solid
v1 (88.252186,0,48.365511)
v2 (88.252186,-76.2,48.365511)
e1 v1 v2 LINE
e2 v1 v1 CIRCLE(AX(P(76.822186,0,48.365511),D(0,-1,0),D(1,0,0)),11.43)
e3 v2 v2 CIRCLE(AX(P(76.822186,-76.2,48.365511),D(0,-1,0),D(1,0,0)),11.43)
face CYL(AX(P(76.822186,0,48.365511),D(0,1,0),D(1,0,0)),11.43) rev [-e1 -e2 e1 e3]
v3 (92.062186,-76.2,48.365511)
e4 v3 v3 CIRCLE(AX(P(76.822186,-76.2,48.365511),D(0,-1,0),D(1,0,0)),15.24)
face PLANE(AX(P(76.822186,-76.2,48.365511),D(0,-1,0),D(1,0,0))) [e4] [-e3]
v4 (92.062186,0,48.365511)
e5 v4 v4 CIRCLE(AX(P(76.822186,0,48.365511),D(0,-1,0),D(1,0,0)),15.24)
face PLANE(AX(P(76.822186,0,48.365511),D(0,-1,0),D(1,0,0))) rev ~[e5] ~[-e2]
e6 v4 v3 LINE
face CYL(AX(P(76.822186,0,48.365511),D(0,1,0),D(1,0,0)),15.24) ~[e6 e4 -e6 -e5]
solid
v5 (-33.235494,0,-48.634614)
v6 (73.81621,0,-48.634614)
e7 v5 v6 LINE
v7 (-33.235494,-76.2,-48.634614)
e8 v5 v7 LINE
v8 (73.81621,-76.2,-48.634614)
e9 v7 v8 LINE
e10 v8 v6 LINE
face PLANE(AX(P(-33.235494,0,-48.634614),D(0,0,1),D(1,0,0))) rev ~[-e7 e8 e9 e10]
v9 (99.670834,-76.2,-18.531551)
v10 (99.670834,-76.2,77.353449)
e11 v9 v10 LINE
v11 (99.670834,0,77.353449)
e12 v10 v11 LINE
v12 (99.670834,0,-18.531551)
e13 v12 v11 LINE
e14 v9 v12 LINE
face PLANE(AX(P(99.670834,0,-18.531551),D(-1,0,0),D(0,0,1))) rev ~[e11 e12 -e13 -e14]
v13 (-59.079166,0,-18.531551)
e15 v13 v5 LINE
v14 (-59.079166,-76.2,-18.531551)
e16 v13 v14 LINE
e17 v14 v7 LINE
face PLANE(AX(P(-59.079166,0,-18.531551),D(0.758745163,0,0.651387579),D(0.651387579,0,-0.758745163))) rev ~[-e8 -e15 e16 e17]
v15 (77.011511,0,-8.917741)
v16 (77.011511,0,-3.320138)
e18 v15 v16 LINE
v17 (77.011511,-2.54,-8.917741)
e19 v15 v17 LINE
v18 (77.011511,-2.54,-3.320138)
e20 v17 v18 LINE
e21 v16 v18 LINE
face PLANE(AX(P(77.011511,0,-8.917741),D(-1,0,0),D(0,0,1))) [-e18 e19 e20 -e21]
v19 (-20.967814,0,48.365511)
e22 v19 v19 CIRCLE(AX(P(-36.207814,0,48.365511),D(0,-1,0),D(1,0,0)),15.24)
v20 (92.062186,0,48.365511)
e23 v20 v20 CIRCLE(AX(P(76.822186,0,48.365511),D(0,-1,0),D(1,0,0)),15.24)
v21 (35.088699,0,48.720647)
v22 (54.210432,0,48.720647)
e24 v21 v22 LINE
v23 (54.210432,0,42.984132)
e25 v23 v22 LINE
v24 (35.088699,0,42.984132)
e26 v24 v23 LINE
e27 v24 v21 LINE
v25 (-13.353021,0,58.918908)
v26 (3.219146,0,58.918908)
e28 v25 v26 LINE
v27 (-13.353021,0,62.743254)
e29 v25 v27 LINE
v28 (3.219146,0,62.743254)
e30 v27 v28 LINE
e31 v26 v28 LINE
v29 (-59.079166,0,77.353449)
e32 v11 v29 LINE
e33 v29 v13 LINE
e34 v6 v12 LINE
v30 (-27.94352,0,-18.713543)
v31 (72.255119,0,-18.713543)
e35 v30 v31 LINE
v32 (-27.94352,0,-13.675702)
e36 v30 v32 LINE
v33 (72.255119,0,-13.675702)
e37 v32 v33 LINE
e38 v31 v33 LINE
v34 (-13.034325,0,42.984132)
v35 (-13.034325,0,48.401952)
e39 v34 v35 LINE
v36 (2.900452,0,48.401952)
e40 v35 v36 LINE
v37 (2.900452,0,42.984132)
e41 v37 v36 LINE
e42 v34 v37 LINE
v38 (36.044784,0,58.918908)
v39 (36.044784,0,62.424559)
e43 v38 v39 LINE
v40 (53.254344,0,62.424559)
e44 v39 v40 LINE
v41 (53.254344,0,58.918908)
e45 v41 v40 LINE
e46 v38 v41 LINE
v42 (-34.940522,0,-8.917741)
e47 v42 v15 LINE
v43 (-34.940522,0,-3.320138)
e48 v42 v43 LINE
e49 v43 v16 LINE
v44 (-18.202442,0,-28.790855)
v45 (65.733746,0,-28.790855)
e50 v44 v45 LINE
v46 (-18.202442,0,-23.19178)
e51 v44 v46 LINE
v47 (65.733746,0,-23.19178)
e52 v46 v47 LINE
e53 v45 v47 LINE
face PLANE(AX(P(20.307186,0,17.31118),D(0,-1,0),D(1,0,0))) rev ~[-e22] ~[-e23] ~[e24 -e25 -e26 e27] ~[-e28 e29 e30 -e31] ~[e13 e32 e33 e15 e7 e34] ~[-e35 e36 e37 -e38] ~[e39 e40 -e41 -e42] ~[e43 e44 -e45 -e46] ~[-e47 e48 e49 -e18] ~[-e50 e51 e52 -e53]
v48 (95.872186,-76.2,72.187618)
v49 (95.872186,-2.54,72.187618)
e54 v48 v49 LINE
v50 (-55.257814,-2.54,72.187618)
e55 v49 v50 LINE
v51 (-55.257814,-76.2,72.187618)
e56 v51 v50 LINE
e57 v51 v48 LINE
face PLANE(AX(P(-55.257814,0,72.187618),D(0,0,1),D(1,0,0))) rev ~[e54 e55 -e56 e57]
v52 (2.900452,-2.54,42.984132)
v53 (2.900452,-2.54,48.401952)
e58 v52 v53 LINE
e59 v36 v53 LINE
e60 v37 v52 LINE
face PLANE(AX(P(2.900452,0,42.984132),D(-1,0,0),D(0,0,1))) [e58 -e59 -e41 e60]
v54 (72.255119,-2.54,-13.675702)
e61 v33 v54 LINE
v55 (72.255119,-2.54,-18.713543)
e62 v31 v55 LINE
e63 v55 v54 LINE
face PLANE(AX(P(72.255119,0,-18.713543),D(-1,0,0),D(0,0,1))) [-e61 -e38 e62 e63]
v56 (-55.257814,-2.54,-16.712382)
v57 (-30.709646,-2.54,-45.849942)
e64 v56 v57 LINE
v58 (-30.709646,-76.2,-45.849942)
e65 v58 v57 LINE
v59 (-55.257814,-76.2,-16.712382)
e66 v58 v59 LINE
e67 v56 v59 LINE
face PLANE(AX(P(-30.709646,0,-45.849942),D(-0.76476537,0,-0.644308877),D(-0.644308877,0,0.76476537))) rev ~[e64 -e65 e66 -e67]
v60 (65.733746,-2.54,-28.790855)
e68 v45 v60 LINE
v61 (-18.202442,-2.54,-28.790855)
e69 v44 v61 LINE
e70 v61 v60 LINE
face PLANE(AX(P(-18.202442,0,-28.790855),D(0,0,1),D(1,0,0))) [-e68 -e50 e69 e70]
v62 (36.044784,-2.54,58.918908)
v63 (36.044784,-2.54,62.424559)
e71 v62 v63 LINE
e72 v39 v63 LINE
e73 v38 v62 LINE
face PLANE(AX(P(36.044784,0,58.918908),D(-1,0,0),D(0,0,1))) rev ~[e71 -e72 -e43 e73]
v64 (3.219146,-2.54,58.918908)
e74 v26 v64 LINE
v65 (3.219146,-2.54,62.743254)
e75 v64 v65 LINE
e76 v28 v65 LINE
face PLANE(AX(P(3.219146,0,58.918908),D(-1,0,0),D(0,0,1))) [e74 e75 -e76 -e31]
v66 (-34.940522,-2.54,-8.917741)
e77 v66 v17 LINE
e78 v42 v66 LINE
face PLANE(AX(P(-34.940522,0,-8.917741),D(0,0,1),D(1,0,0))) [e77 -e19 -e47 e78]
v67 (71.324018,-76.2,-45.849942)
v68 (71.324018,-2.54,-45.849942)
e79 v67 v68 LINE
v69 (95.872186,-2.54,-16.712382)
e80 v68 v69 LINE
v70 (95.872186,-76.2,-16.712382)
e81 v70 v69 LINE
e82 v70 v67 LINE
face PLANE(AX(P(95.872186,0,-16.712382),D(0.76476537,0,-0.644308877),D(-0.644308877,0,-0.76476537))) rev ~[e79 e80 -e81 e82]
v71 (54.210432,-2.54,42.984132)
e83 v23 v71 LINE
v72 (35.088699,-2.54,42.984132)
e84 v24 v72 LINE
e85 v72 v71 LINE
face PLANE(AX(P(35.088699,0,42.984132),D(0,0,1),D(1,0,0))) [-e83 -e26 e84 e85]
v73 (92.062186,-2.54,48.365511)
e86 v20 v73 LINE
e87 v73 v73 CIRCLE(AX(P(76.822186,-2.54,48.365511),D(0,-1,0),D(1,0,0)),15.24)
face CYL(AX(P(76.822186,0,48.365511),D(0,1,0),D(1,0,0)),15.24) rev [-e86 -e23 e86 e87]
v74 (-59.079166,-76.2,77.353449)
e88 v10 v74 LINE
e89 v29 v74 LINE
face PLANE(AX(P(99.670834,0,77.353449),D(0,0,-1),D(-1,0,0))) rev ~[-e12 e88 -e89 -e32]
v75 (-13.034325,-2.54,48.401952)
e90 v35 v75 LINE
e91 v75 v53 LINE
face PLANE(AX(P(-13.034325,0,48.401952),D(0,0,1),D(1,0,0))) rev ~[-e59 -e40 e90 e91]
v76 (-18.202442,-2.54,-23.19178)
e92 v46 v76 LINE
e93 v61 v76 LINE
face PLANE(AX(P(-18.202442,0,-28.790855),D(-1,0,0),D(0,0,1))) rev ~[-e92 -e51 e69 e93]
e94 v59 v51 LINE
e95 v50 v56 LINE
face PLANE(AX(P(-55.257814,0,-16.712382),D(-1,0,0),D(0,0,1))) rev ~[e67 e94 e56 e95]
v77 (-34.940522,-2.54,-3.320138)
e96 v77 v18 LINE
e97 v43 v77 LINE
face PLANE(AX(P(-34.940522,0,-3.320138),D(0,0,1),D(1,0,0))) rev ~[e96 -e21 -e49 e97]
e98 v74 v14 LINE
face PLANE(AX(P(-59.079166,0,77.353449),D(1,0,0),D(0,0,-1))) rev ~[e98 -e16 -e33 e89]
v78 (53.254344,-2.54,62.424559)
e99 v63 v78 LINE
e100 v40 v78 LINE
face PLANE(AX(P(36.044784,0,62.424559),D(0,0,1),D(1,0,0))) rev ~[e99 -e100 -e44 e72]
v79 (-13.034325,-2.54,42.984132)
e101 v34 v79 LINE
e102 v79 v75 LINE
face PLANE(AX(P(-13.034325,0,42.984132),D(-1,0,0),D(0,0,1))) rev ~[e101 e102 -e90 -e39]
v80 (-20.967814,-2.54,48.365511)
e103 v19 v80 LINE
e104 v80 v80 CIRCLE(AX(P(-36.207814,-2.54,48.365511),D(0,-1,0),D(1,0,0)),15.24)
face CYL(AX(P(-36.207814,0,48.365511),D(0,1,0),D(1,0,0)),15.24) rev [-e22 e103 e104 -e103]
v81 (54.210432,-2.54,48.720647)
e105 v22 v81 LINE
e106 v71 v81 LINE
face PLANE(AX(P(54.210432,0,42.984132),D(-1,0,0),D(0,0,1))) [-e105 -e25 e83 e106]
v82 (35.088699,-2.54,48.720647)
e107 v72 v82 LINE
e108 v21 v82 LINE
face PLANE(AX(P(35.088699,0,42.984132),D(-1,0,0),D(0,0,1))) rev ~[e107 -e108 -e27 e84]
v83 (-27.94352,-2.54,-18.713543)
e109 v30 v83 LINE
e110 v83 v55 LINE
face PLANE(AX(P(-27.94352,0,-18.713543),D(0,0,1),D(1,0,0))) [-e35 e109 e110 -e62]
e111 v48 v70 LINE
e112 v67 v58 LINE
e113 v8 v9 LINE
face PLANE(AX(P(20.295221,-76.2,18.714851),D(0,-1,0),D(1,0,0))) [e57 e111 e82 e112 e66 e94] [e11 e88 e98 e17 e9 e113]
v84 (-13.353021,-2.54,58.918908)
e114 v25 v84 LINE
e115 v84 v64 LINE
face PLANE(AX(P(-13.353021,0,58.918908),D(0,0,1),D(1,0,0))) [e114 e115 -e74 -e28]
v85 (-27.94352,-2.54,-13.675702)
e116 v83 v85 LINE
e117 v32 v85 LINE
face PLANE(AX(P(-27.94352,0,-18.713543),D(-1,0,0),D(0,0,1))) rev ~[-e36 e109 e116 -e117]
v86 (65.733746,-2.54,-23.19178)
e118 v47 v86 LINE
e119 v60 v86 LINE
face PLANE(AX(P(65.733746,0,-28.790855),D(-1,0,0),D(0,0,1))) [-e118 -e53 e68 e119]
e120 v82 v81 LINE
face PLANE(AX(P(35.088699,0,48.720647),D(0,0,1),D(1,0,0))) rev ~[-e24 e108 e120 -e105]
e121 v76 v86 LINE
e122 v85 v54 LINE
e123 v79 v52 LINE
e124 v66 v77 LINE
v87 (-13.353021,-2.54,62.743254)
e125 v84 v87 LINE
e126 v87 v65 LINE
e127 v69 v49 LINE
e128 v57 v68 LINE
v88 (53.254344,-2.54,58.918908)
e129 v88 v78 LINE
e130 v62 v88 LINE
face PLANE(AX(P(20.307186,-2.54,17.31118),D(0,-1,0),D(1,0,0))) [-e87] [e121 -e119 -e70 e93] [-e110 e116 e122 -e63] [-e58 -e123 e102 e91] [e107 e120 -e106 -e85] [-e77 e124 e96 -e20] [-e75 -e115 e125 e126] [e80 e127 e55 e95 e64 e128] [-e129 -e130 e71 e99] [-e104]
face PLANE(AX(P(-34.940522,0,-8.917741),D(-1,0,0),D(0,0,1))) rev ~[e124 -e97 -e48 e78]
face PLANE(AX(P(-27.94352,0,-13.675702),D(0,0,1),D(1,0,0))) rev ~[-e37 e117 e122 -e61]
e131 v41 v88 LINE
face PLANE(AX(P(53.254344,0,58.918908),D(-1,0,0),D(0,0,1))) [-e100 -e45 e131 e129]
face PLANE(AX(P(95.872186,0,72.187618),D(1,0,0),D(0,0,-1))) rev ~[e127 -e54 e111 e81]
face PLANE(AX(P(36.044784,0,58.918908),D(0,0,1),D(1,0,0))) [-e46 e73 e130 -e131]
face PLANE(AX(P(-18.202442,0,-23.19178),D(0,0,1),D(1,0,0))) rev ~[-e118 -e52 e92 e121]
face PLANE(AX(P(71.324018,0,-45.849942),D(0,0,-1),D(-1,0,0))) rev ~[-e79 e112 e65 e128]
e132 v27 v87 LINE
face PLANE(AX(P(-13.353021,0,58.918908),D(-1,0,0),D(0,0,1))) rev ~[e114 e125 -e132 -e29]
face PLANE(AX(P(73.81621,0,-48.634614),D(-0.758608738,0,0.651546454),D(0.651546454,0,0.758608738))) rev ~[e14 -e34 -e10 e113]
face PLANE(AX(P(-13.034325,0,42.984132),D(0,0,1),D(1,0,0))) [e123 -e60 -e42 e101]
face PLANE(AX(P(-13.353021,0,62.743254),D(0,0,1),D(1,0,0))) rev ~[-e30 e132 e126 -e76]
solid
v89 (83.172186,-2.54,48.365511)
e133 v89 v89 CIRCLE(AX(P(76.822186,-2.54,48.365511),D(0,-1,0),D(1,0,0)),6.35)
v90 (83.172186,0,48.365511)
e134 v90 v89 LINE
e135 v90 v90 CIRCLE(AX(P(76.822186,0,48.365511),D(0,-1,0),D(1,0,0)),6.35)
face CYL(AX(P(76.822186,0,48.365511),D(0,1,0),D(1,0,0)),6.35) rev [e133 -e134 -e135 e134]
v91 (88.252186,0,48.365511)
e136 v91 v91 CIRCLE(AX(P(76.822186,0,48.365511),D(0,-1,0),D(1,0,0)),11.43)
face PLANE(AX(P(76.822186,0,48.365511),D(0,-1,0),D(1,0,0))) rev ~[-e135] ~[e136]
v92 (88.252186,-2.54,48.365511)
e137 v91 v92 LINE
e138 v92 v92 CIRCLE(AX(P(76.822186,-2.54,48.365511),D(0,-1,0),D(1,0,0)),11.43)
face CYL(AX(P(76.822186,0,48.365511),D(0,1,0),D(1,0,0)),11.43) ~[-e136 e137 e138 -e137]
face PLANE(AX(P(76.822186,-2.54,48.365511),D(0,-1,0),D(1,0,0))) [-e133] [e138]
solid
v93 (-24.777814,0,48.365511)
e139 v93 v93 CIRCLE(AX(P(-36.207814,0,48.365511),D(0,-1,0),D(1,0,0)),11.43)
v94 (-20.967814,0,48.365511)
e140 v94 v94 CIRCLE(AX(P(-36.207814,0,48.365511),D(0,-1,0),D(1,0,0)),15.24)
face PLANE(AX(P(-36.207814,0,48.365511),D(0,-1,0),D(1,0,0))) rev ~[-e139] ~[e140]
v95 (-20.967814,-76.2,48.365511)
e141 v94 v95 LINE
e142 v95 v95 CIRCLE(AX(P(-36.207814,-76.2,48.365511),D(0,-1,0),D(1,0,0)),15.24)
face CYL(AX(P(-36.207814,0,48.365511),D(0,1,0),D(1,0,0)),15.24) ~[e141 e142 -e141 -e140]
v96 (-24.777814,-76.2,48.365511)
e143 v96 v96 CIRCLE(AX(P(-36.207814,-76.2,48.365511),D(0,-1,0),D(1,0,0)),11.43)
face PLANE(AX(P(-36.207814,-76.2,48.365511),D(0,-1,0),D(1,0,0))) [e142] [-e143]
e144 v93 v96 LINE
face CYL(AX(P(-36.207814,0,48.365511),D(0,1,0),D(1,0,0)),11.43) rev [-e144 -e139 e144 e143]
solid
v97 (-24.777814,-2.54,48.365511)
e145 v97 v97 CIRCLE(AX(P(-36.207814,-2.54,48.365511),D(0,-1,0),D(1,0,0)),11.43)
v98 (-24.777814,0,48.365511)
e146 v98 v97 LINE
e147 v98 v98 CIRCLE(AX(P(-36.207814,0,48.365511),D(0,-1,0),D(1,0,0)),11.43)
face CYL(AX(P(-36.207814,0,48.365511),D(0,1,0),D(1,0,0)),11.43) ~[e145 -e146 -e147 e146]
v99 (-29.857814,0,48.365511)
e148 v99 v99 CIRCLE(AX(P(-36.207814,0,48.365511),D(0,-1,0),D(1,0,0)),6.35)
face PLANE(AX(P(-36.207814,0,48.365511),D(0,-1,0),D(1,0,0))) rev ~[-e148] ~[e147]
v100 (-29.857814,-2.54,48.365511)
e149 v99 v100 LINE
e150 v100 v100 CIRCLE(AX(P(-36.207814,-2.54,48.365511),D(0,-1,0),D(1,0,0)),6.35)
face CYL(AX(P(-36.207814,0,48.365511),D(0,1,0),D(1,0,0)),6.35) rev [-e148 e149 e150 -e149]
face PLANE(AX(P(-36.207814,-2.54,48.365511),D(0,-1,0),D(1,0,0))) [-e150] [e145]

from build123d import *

# Parameters (mm, degrees)
F1_DEPTH = 76.2
F0_R     = 6.35
F0_W     = 83.9361876732
F0_H     = 5.5990750616
F0_W_2   = 100.1986385042
F0_H_2   = 5.0378413871
F0_W_3   = 111.9520328939
F0_H_3   = 5.5976028088
F0_W_4   = 15.9347772133
F0_H_4   = 5.4178200662
F0_R_2   = 15.24
F0_W_5   = 16.5721669327
F0_H_5   = 3.8243457675
F0_W_6   = 19.1217325628
F0_H_6   = 5.736514926
F0_W_7   = 17.209559679
F0_H_7   = 3.5056509078
F3_DEPTH = 2.54
F0_R_3   = 11.43
F4_DEPTH = 25.4
F5_DEPTH = 76.2


with BuildPart() as f1:
    # F0 (on Front) → F1 (new body)
    with BuildSketch(Plane.XZ):
        Polygon((99.6708340498, 77.3534489229), (-59.0791659502, 77.3534489229), (-59.0791659502, -18.5315510771), (-33.2354940474, -48.6346136725), (73.8162100315, -48.6346136725), (99.6708340498, -18.5315510771), align=None)
        Polygon((-55.2578138162, -16.7123815692), (-55.2578138162, 72.1876184308), (95.8721861838, 72.1876184308), (95.8721861838, -16.7123815692), (71.3240179544, -45.8499421496), (-30.7096455867, -45.8499421496), align=None, mode=Mode.SUBTRACT)
    extrude(amount=F1_DEPTH)

    # F0 (on Front) → F3 (join)
    with BuildSketch(Plane.XZ):
        Polygon((95.8721861838, 72.1876184308), (-55.2578138162, 72.1876184308), (-55.2578138162, -16.7123815692), (-30.7096455867, -45.8499421496), (71.3240179544, -45.8499421496), (95.8721861838, -16.7123815692), align=None)
        with Locations((23.7656522681, -25.9913175088)):
            Rectangle(F0_W, F0_H, mode=Mode.SUBTRACT)
        with Locations((22.1557993767, -16.194622498)):
            Rectangle(F0_W_2, F0_H_2, mode=Mode.SUBTRACT)
        with Locations((21.0354942828, -6.1189391417)):
            Rectangle(F0_W_3, F0_H_3, mode=Mode.SUBTRACT)
        with Locations((-5.0669364864, 45.6930417567)):
            Rectangle(F0_W_4, F0_H_4, mode=Mode.SUBTRACT)
        with Locations((-36.2078138162, 48.3655110002)):
            Circle(F0_R_2, mode=Mode.SUBTRACT)
        with Locations((-5.0669374177, 60.8310811222)):
            Rectangle(F0_W_5, F0_H_5, mode=Mode.SUBTRACT)
        with Locations((44.6495655924, 45.8523891866)):
            Rectangle(F0_W_6, F0_H_6, mode=Mode.SUBTRACT)
        with Locations((44.6495637298, 60.6717336923)):
            Rectangle(F0_W_7, F0_H_7, mode=Mode.SUBTRACT)
        with Locations((76.8221861838, 48.3655110002)):
            Circle(F0_R_2, mode=Mode.SUBTRACT)
    extrude(amount=F3_DEPTH)

    # F0 (on Front) → F4 (join)
    with BuildSketch(Plane.XZ):
        Polygon((99.6708340498, 77.3534489229), (-59.0791659502, 77.3534489229), (-59.0791659502, -18.5315510771), (-33.2354940474, -48.6346136725), (73.8162100315, -48.6346136725), (99.6708340498, -18.5315510771), align=None)
        Polygon((-55.2578138162, -16.7123815692), (-55.2578138162, 72.1876184308), (95.8721861838, 72.1876184308), (95.8721861838, -16.7123815692), (71.3240179544, -45.8499421496), (-30.7096455867, -45.8499421496), align=None, mode=Mode.SUBTRACT)
    extrude(amount=F4_DEPTH)


with BuildPart() as f1b:
    # F0 (on Front) → F1, piece 2 (new body)
    with BuildSketch(Plane.XZ):
        with Locations((-36.2078138162, 48.3655110002)):
            Circle(F0_R)
    extrude(amount=F1_DEPTH)


with BuildPart() as f3:
    # F0 (on Front) → F3, piece 2 (new body)
    with BuildSketch(Plane.XZ):
        with Locations((-36.2078138162, 48.3655110002)):
            Circle(F0_R_3)
        with Locations((-36.2078138162, 48.3655110002)):
            Circle(F0_R, mode=Mode.SUBTRACT)
    extrude(amount=F3_DEPTH)


with BuildPart() as f3b:
    # F0 (on Front) → F3, piece 3 (new body)
    with BuildSketch(Plane.XZ):
        with Locations((76.8221861838, 48.3655110002)):
            Circle(F0_R_3)
        with Locations((76.8221861838, 48.3655110002)):
            Circle(F0_R, mode=Mode.SUBTRACT)
    extrude(amount=F3_DEPTH)


with BuildPart() as f5:
    # F0 (on Front) → F5 (new body)
    with BuildSketch(Plane.XZ):
        with Locations((-36.2078138162, 48.3655110002)):
            Circle(F0_R_2)
        with Locations((-36.2078138162, 48.3655110002)):
            Circle(F0_R_3, mode=Mode.SUBTRACT)
    extrude(amount=F5_DEPTH)


with BuildPart() as f5b:
    # F0 (on Front) → F5, piece 2 (new body)
    with BuildSketch(Plane.XZ):
        with Locations((76.8221861838, 48.3655110002)):
            Circle(F0_R_2)
        with Locations((76.8221861838, 48.3655110002)):
            Circle(F0_R_3, mode=Mode.SUBTRACT)
    extrude(amount=F5_DEPTH)


solid = Compound([f1.part, f3.part, f3b.part, f5.part, f5b.part])
